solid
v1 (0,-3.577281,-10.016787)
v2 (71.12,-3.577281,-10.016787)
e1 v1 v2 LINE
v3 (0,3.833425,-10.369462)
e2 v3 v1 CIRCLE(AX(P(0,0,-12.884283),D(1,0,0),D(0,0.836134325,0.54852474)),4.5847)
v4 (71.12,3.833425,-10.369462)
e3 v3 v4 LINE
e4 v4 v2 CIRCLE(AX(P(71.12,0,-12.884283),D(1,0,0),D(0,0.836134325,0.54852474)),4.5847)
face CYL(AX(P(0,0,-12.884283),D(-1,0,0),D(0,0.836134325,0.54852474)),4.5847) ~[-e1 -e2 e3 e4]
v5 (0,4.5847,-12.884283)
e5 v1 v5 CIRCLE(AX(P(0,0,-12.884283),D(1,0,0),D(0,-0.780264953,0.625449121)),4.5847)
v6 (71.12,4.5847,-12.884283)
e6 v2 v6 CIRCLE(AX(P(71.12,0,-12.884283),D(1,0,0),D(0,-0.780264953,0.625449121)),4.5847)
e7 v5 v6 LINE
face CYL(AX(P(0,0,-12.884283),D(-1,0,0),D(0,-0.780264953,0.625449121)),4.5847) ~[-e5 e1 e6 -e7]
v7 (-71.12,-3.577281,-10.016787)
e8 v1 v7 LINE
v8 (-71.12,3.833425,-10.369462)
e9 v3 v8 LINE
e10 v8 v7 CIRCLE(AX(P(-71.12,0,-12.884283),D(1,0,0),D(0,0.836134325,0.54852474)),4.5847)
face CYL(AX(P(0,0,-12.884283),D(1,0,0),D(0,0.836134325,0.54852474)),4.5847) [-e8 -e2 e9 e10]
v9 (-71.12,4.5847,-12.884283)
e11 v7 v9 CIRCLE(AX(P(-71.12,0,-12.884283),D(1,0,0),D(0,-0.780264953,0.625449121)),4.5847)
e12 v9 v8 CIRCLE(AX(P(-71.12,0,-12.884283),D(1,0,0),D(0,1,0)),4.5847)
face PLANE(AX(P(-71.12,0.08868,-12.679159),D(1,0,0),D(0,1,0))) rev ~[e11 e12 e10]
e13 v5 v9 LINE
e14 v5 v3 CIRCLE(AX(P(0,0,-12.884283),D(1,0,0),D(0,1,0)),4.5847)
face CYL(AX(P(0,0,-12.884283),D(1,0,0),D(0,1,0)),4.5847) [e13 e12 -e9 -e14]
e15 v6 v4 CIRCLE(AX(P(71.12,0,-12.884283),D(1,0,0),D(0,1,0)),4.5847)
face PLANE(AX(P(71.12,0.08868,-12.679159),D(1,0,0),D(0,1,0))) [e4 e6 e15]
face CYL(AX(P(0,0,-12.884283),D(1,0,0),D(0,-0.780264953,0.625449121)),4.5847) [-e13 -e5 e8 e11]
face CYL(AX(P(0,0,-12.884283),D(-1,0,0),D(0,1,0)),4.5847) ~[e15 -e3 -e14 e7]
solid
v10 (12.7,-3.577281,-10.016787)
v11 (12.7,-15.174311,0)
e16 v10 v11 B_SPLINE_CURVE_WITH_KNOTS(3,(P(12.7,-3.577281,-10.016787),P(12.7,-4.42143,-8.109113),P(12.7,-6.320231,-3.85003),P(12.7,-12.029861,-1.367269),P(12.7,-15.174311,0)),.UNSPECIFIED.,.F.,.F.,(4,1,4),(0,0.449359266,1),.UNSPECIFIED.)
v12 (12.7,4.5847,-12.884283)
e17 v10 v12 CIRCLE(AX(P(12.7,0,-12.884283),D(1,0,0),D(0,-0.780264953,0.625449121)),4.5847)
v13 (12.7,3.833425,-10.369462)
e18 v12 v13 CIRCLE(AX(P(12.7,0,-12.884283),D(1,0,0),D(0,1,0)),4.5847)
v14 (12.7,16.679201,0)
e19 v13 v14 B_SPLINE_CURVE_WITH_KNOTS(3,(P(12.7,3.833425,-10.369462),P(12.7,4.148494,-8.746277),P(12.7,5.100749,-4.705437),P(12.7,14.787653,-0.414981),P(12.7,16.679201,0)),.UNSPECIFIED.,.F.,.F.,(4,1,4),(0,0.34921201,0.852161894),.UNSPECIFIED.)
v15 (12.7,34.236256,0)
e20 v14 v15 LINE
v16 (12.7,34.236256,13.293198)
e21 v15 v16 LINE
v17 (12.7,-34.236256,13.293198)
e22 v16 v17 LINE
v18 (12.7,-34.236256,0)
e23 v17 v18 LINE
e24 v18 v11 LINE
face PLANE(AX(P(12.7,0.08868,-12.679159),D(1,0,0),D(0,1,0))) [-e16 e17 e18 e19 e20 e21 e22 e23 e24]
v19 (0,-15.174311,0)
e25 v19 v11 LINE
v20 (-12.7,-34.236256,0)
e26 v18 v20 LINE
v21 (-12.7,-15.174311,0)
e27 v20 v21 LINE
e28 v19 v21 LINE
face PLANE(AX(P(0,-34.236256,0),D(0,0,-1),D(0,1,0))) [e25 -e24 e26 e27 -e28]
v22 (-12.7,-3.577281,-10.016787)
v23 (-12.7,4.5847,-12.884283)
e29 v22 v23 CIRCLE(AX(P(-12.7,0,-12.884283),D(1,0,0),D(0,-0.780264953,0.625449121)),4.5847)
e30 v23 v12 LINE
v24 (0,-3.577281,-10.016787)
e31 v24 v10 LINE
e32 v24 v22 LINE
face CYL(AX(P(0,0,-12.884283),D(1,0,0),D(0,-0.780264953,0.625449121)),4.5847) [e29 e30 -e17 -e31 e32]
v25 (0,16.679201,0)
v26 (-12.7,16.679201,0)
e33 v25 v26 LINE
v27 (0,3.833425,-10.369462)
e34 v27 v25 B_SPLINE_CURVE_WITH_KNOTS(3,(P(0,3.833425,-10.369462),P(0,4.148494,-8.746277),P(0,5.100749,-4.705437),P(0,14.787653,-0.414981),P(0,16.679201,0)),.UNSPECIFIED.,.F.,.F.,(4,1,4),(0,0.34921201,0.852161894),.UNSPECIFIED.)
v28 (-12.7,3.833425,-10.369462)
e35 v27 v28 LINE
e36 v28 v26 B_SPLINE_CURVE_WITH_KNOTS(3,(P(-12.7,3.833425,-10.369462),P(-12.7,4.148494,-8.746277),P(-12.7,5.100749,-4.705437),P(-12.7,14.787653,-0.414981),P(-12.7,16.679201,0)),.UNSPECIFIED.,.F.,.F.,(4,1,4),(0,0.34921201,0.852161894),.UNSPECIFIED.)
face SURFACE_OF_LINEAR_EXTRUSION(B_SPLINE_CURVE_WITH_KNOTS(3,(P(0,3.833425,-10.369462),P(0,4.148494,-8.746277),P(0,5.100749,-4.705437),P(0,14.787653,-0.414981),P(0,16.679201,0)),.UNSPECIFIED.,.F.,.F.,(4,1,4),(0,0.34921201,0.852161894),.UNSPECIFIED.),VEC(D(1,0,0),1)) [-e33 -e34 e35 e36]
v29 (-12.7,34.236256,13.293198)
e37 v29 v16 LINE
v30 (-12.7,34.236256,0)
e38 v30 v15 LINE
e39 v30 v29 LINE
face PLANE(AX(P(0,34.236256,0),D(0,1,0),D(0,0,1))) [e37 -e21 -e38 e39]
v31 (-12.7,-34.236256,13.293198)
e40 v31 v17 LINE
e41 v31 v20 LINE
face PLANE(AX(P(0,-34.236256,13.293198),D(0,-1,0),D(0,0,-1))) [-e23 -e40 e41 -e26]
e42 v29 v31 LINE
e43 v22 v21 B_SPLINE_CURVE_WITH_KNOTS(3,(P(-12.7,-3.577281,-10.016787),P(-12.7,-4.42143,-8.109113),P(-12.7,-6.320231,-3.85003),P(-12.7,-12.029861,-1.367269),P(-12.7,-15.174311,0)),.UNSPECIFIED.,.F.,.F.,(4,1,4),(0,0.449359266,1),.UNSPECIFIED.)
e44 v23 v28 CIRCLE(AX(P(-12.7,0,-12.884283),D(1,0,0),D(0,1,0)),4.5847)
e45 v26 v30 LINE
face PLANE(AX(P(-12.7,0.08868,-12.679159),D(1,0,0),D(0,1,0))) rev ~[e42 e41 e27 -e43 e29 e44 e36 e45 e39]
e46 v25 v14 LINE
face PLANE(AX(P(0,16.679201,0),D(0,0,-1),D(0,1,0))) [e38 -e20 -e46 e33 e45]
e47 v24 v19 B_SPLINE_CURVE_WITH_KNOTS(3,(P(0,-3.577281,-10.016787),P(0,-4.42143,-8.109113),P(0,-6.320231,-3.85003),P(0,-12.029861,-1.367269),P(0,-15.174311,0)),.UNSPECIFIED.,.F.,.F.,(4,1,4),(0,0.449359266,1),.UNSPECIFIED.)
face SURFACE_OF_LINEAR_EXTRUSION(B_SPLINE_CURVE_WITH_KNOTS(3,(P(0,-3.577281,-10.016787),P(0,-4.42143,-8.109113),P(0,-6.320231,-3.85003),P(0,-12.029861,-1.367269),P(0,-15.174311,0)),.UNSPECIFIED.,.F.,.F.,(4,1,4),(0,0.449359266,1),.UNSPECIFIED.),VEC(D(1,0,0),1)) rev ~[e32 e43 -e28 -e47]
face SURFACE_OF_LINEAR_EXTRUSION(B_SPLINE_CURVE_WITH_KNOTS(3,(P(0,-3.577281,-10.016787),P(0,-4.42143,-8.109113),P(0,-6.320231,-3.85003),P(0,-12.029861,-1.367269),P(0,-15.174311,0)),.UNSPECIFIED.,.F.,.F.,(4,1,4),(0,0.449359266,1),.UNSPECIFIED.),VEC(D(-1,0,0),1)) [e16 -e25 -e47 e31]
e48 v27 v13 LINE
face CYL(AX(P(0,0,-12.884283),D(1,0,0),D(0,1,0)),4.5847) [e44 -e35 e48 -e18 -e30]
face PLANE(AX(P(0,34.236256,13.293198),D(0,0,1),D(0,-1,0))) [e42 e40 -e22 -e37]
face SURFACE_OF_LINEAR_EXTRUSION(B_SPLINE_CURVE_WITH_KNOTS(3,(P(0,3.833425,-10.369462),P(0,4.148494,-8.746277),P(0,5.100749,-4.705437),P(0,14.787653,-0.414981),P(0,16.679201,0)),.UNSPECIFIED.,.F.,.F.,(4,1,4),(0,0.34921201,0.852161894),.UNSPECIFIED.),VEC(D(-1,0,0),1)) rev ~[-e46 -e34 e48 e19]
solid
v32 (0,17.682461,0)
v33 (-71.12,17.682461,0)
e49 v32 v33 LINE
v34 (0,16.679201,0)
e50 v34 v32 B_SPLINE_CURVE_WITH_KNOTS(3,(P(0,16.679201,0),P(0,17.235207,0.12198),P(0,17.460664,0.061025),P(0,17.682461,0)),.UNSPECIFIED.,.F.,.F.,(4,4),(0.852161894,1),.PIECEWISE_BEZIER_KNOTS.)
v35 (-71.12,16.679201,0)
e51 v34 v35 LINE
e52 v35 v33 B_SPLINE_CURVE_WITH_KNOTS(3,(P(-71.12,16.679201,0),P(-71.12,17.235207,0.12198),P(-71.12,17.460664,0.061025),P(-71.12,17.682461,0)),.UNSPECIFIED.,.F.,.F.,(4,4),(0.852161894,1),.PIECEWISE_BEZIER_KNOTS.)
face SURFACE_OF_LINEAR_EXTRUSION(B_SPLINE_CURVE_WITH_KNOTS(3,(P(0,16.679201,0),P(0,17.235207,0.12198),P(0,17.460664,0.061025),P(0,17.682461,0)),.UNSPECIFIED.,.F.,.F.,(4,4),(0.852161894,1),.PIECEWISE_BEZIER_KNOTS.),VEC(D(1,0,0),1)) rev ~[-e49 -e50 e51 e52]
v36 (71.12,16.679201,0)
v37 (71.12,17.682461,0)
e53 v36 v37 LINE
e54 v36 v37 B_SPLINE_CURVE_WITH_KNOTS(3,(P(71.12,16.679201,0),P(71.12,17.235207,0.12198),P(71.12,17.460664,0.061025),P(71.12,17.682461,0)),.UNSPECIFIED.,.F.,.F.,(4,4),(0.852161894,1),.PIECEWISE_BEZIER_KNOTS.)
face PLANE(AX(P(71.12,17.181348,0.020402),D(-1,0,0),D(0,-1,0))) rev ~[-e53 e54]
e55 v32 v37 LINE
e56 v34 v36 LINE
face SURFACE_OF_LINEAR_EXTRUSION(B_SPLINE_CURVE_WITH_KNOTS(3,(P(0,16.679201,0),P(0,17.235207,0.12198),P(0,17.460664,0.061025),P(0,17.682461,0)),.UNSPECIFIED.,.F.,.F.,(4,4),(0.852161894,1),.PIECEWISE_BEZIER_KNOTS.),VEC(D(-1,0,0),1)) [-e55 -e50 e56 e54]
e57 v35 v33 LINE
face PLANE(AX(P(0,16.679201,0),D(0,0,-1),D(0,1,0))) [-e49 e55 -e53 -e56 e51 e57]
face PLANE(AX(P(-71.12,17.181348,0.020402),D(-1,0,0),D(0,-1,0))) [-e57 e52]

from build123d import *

# Parameters (mm, degrees)
F1_DEPTH = 71.12
F2_DEPTH = 12.7


with BuildPart() as f1:
    # F0 (on Right) → F1 (new body, symmetric)
    with BuildSketch(Plane.YZ):
        with BuildLine():
            ThreePointArc((-3.5772807297, -10.0167868583), (-1.5196570548, -17.2098026647), (4.5847, -12.8842834444))
            ThreePointArc((4.5847, -12.8842834444), (4.3928679628, -11.5719629228), (3.8334250414, -10.3694620706))
            ThreePointArc((3.8334250414, -10.3694620706), (0.2179390476, -8.304766367), (-3.5772807297, -10.0167868583))
        make_face()
    extrude(amount=F1_DEPTH, both=True)


with BuildPart() as f1b:
    # F0 (on Right) → F1, piece 2 (new body, symmetric)
    with BuildSketch(Plane.YZ):
        with BuildLine():
            add(Edge.make_bspline(
                [(16.6792012751, 0), (17.2352067537, 0.12198039), (17.4606638005, 0.0610249655), (17.682461068, 0)],
                knots=[0.8521618943, 0.8521618943, 0.8521618943, 0.8521618943, 1, 1, 1, 1], degree=3))
            Line((16.6792012751, 0), (17.682461068, 0))
        make_face()
    extrude(amount=F1_DEPTH, both=True)


with BuildPart() as f2:
    # F0 (on Right) → F2 (new body, symmetric)
    with BuildSketch(Plane.YZ):
        with BuildLine():
            ThreePointArc((-3.5772807297, -10.0167868583), (-1.5196570548, -17.2098026647), (4.5847, -12.8842834444))
            ThreePointArc((4.5847, -12.8842834444), (4.3928679628, -11.5719629228), (3.8334250414, -10.3694620706))
            ThreePointArc((3.8334250414, -10.3694620706), (0.2179390476, -8.304766367), (-3.5772807297, -10.0167868583))
        make_face()
        with BuildLine():
            ThreePointArc((-3.5772807297, -10.0167868583), (0.2179390476, -8.304766367), (3.8334250414, -10.3694620706))
            add(Edge.make_bspline(
                [(3.8334250414, -10.3694620706), (4.1484940345, -8.7462774015), (5.1007491044, -4.7054371148), (14.7876531546, -0.4149811222), (16.6792012751, 0)],
                knots=[0, 0, 0, 0, 0.3492120103, 0.8521618943, 0.8521618943, 0.8521618943, 0.8521618943], degree=3))
            Line((16.6792012751, 0), (-15.1743106544, 0))
            add(Edge.make_bspline(
                [(-3.5772807297, -10.0167868583), (-4.4214296894, -8.1091133852), (-6.3202305252, -3.8500304601), (-12.0298605248, -1.3672692408), (-15.1743106544, 0)],
                knots=[0, 0, 0, 0, 0.4493592658, 1, 1, 1, 1], degree=3))
        make_face()
        with BuildLine():
            Line((-15.1743106544, 0), (16.6792012751, 0))
            add(Edge.make_bspline(
                [(16.6792012751, 0), (17.2352067537, 0.12198039), (17.4606638005, 0.0610249655), (17.682461068, 0)],
                knots=[0.8521618943, 0.8521618943, 0.8521618943, 0.8521618943, 1, 1, 1, 1], degree=3))
            Line((17.682461068, 0), (34.2362560332, 0))
            Line((34.2362560332, 0), (34.2362560332, 13.2931983098))
            Line((34.2362560332, 13.2931983098), (-34.2362560332, 13.2931983098))
            Line((-34.2362560332, 13.2931983098), (-34.2362560332, 0))
            Line((-34.2362560332, 0), (-15.1743106544, 0))
        make_face()
        with BuildLine():
            add(Edge.make_bspline(
                [(16.6792012751, 0), (17.2352067537, 0.12198039), (17.4606638005, 0.0610249655), (17.682461068, 0)],
                knots=[0.8521618943, 0.8521618943, 0.8521618943, 0.8521618943, 1, 1, 1, 1], degree=3))
            Line((16.6792012751, 0), (17.682461068, 0))
        make_face()
    extrude(amount=F2_DEPTH, both=True)


solid = Compound([f1.part, f1b.part, f2.part])
